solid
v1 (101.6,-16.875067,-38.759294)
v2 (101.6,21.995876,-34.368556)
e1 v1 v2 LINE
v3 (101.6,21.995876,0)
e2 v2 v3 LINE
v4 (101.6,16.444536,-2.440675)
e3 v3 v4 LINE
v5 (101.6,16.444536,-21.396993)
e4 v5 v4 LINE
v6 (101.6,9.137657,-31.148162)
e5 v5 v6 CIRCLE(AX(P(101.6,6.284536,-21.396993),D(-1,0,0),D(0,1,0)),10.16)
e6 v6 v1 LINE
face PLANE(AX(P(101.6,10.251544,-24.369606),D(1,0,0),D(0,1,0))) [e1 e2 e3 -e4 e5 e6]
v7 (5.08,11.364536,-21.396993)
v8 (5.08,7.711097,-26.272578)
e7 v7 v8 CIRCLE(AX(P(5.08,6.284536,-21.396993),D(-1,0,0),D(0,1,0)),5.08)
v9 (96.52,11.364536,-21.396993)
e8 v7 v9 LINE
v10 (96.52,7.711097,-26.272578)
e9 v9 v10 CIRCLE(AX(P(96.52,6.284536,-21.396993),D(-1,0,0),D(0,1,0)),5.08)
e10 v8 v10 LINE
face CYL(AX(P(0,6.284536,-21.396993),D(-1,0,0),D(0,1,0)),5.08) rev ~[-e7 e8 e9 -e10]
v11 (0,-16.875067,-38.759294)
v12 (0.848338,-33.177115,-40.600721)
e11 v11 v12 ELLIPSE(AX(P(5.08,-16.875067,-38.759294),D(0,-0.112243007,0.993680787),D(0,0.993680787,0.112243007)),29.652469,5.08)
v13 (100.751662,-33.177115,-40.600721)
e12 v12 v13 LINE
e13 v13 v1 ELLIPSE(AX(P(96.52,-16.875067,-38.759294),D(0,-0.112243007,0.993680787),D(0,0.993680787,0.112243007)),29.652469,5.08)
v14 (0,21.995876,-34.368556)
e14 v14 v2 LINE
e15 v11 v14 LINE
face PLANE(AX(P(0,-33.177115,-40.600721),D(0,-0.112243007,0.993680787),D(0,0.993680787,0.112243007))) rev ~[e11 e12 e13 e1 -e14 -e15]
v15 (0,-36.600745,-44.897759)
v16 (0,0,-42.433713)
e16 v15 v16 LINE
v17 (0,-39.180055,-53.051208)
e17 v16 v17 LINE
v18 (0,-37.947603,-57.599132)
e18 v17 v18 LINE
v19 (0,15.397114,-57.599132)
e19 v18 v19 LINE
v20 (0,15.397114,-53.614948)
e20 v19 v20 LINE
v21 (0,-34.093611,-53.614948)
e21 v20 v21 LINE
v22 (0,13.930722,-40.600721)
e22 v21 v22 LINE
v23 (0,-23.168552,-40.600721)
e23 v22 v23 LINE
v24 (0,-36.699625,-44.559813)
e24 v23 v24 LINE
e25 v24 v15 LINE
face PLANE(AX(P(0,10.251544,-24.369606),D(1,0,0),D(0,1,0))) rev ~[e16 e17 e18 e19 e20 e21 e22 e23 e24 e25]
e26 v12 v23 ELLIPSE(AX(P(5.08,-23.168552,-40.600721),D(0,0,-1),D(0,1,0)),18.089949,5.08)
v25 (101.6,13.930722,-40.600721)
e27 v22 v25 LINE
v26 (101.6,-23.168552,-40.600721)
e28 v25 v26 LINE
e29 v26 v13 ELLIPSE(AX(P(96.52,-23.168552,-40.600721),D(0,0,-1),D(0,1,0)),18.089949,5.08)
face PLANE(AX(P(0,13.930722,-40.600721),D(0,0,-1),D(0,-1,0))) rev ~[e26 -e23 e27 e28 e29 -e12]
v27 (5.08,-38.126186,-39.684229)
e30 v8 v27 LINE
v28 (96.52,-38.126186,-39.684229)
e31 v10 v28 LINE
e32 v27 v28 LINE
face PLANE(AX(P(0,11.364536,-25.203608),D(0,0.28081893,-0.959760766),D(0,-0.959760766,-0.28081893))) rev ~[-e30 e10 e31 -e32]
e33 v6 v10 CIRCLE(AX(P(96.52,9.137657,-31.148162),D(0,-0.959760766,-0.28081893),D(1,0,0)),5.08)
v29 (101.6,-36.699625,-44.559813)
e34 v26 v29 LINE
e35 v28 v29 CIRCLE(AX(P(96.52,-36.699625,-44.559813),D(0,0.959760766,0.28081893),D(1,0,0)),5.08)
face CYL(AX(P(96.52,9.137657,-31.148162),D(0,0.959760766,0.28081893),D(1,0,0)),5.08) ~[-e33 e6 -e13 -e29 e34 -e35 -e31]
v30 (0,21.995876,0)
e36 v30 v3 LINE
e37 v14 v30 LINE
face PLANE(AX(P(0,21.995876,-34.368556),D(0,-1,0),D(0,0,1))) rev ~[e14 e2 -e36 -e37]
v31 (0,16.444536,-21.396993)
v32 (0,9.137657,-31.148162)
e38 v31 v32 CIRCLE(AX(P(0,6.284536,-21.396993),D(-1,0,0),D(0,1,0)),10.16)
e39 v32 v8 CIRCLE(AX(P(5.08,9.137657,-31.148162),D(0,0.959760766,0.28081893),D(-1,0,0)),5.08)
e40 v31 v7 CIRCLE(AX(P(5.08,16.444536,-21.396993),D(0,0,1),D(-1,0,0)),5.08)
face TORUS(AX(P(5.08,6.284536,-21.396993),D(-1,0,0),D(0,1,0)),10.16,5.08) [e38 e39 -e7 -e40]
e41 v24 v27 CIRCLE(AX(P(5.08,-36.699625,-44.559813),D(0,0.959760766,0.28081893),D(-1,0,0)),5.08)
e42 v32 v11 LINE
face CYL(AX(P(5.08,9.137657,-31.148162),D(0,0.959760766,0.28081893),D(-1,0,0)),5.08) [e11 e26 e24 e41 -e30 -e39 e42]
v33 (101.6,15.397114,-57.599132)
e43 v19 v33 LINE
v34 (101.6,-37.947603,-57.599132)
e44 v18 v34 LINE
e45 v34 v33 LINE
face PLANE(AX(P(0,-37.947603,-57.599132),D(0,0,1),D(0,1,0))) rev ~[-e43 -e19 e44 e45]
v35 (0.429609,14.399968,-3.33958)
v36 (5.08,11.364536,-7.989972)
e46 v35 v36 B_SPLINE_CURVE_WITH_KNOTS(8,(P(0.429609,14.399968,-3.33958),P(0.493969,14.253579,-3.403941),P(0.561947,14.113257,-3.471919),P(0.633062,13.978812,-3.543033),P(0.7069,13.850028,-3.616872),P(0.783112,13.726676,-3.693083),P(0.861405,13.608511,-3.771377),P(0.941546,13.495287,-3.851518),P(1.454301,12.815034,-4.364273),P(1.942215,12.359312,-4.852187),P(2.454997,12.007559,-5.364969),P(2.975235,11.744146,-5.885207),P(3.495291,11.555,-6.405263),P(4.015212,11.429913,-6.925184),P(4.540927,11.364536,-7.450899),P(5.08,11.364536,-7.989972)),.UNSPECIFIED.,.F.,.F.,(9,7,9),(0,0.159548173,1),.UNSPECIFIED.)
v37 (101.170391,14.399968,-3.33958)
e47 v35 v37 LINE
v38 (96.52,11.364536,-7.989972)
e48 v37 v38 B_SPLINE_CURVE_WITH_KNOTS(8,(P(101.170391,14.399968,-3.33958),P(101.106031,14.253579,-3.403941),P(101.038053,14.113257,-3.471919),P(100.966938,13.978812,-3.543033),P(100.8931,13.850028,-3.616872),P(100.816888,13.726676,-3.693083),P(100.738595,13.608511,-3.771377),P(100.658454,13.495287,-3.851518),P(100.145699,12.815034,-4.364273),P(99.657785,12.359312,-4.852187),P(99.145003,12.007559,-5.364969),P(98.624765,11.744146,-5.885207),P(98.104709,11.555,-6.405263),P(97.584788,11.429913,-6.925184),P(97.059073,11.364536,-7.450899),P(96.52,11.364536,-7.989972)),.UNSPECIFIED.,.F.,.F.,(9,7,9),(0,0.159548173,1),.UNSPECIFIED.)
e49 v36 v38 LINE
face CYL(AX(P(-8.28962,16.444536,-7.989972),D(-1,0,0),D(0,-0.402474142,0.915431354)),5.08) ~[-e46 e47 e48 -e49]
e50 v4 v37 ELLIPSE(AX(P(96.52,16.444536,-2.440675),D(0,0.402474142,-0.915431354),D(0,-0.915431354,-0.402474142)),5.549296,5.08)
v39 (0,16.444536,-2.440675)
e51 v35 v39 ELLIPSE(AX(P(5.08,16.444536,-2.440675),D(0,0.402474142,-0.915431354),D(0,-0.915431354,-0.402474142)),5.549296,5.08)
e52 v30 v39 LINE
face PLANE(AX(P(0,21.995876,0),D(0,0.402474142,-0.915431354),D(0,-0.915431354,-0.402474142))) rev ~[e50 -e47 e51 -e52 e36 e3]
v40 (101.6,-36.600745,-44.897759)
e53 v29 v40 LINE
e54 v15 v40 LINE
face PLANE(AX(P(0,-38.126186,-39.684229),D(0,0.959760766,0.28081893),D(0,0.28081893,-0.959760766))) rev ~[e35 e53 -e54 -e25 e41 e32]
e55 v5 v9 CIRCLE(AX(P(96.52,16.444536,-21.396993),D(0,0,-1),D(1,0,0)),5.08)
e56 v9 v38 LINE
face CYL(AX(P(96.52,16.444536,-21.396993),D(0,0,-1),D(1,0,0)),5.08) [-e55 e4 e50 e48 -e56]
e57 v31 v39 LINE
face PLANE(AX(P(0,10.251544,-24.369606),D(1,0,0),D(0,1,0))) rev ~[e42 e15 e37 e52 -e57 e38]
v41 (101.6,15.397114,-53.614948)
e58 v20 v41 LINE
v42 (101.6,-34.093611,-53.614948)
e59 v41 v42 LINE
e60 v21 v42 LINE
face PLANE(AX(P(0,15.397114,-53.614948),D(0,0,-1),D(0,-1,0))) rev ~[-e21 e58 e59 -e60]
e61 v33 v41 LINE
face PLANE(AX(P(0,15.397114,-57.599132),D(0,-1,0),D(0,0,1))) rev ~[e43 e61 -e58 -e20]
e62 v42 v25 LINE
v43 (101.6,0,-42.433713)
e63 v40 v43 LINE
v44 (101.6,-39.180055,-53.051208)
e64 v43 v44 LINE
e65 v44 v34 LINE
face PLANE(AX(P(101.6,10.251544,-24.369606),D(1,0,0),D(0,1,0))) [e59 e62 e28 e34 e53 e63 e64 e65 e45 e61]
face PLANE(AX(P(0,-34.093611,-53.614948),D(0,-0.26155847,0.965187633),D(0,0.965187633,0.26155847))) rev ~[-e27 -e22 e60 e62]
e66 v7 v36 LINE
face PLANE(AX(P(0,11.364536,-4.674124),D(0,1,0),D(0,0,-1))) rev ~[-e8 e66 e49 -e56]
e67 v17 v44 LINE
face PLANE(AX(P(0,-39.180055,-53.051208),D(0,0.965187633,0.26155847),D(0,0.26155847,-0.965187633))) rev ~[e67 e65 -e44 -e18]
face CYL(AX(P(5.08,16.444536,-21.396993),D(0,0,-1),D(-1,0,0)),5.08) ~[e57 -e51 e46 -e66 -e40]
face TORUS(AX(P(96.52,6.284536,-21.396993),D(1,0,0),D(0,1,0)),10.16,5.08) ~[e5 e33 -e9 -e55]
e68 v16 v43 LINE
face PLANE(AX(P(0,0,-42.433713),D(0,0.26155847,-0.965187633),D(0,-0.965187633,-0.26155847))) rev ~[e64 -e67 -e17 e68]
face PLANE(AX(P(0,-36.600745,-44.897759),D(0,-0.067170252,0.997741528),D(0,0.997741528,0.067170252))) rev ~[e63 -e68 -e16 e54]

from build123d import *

# Parameters (mm, degrees)
F1_DEPTH     = 101.6
F2_T1_DEPTH  = 101.6
F2_T3_DEPTH  = 118.1792407144
F2_T5_DEPTH  = 29.422869264
F2_T7_DEPTH  = 60.4590704492
F2_T10_ANGLE = 73.6909129446
F2_T12_ANGLE = 73.6909129446


# Not quite as in the source:
# - a fillet or chamfer that OpenCascade refuses, or shapes differently, is made with other operations: its cross-section is extruded or revolved along the edge and cut away or added


with BuildPart() as f1:
    # F0 (on Right) → F1 (new body)
    with BuildSketch(Plane.YZ):
        Polygon((15.3971137479, -57.599131723), (15.3971137479, -53.6149479449), (-34.0936109424, -53.6149479449), (13.9307221398, -40.600720793), (-33.1771150231, -40.600720793), (21.9958759844, -34.3685559928), (21.9958759844, 0), (11.3645363599, -4.6741236001), (11.3645363599, -25.2036079764), (-38.1261855364, -39.6842285991), (-36.6007449852, -44.8977588791), (0, -42.4337126315), (-39.1800553827, -53.0512081353), (-37.9476028562, -57.599131723), align=None)
    extrude(amount=F1_DEPTH)

    # F2: fillet of radius 5.08 on 6 edges, made by hand

    # F2_s2 → F2_t1 (join)
    with BuildSketch(Plane.YZ):
        with BuildLine():
            ThreePointArc((11.3645363599, -21.3969928641), (10.3498362027, -24.44325897), (7.7110965222, -26.2725775576))
            Line((7.7110965222, -26.2725775576), (11.3645363599, -25.2036079764))
            Line((11.3645363599, -25.2036079764), (11.3645363599, -21.3969928641))
        make_face()
    extrude(amount=F2_T1_DEPTH)

    # F2_s4 → F2_t3 (cut)
    with BuildSketch(Plane.YZ.offset(-8.2896203572)):
        with BuildLine():
            ThreePointArc((14.3999677165, -3.3395804625), (12.1905494824, -5.2132838517), (11.3645363599, -7.989971743))
            Line((11.3645363599, -7.989971743), (11.3645363599, -4.6741236001))
            Line((11.3645363599, -4.6741236001), (14.3999677165, -3.3395804625))
        make_face()
    extrude(amount=F2_T3_DEPTH, mode=Mode.SUBTRACT)

    # F2_s6 → F2_t5 (cut)
    with BuildSketch(Plane.XY.offset(-21.3969928641)):
        with BuildLine():
            ThreePointArc((0, 16.4445363599), (1.4878975516, 12.8524339115), (5.08, 11.3645363599))
            Line((5.08, 11.3645363599), (0, 11.3645363599))
            Line((0, 11.3645363599), (0, 16.4445363599))
        make_face()
        with BuildLine():
            ThreePointArc((101.6, 16.4445363599), (100.1121024484, 12.8524339115), (96.52, 11.3645363599))
            Line((96.52, 11.3645363599), (101.6, 11.3645363599))
            Line((101.6, 11.3645363599), (101.6, 16.4445363599))
        make_face()
    extrude(amount=F2_T5_DEPTH, mode=Mode.SUBTRACT)

    # F2_s8 → F2_t7 (cut)
    with BuildSketch(Plane(origin=(0, 0.0220464736, 0.0064506358), x_dir=(1, 0, 0), z_dir=(0, -0.9597607664, -0.2808189296))):
        with BuildLine():
            ThreePointArc((0, -32.4608110442), (1.4878975516, -28.8687085958), (5.08, -27.3808110442))
            Line((5.08, -27.3808110442), (0, -27.3808110442))
            Line((0, -27.3808110442), (0, -32.4608110442))
        make_face()
        with BuildLine():
            ThreePointArc((101.6, -32.4608110442), (100.1121024484, -28.8687085958), (96.52, -27.3808110442))
            Line((96.52, -27.3808110442), (101.6, -27.3808110442))
            Line((101.6, -27.3808110442), (101.6, -32.4608110442))
        make_face()
    extrude(amount=F2_T7_DEPTH, mode=Mode.SUBTRACT)

    # F2_s9 → F2_t10 (revolve, cut)
    with BuildSketch(Plane.XY.offset(-21.3969928641)):
        with BuildLine():
            ThreePointArc((101.6, 16.4445363599), (100.1121024484, 12.8524339115), (96.52, 11.3645363599))
            Line((96.52, 11.3645363599), (101.6, 11.3645363599))
            Line((101.6, 11.3645363599), (101.6, 16.4445363599))
        make_face()
    revolve(axis=Axis((101.6, 6.2845363599, -21.3969928641), (-1, 0, 0)), revolution_arc=F2_T10_ANGLE, mode=Mode.SUBTRACT)

    # F2_s11 → F2_t12 (revolve, cut)
    with BuildSketch(Plane.XY.offset(-21.3969928641)):
        with BuildLine():
            ThreePointArc((0, 16.4445363599), (1.4878975516, 12.8524339115), (5.08, 11.3645363599))
            Line((5.08, 11.3645363599), (0, 11.3645363599))
            Line((0, 11.3645363599), (0, 16.4445363599))
        make_face()
    revolve(axis=Axis((0, 6.2845363599, -21.3969928641), (-1, 0, 0)), revolution_arc=F2_T12_ANGLE, mode=Mode.SUBTRACT)


solid = f1.part
